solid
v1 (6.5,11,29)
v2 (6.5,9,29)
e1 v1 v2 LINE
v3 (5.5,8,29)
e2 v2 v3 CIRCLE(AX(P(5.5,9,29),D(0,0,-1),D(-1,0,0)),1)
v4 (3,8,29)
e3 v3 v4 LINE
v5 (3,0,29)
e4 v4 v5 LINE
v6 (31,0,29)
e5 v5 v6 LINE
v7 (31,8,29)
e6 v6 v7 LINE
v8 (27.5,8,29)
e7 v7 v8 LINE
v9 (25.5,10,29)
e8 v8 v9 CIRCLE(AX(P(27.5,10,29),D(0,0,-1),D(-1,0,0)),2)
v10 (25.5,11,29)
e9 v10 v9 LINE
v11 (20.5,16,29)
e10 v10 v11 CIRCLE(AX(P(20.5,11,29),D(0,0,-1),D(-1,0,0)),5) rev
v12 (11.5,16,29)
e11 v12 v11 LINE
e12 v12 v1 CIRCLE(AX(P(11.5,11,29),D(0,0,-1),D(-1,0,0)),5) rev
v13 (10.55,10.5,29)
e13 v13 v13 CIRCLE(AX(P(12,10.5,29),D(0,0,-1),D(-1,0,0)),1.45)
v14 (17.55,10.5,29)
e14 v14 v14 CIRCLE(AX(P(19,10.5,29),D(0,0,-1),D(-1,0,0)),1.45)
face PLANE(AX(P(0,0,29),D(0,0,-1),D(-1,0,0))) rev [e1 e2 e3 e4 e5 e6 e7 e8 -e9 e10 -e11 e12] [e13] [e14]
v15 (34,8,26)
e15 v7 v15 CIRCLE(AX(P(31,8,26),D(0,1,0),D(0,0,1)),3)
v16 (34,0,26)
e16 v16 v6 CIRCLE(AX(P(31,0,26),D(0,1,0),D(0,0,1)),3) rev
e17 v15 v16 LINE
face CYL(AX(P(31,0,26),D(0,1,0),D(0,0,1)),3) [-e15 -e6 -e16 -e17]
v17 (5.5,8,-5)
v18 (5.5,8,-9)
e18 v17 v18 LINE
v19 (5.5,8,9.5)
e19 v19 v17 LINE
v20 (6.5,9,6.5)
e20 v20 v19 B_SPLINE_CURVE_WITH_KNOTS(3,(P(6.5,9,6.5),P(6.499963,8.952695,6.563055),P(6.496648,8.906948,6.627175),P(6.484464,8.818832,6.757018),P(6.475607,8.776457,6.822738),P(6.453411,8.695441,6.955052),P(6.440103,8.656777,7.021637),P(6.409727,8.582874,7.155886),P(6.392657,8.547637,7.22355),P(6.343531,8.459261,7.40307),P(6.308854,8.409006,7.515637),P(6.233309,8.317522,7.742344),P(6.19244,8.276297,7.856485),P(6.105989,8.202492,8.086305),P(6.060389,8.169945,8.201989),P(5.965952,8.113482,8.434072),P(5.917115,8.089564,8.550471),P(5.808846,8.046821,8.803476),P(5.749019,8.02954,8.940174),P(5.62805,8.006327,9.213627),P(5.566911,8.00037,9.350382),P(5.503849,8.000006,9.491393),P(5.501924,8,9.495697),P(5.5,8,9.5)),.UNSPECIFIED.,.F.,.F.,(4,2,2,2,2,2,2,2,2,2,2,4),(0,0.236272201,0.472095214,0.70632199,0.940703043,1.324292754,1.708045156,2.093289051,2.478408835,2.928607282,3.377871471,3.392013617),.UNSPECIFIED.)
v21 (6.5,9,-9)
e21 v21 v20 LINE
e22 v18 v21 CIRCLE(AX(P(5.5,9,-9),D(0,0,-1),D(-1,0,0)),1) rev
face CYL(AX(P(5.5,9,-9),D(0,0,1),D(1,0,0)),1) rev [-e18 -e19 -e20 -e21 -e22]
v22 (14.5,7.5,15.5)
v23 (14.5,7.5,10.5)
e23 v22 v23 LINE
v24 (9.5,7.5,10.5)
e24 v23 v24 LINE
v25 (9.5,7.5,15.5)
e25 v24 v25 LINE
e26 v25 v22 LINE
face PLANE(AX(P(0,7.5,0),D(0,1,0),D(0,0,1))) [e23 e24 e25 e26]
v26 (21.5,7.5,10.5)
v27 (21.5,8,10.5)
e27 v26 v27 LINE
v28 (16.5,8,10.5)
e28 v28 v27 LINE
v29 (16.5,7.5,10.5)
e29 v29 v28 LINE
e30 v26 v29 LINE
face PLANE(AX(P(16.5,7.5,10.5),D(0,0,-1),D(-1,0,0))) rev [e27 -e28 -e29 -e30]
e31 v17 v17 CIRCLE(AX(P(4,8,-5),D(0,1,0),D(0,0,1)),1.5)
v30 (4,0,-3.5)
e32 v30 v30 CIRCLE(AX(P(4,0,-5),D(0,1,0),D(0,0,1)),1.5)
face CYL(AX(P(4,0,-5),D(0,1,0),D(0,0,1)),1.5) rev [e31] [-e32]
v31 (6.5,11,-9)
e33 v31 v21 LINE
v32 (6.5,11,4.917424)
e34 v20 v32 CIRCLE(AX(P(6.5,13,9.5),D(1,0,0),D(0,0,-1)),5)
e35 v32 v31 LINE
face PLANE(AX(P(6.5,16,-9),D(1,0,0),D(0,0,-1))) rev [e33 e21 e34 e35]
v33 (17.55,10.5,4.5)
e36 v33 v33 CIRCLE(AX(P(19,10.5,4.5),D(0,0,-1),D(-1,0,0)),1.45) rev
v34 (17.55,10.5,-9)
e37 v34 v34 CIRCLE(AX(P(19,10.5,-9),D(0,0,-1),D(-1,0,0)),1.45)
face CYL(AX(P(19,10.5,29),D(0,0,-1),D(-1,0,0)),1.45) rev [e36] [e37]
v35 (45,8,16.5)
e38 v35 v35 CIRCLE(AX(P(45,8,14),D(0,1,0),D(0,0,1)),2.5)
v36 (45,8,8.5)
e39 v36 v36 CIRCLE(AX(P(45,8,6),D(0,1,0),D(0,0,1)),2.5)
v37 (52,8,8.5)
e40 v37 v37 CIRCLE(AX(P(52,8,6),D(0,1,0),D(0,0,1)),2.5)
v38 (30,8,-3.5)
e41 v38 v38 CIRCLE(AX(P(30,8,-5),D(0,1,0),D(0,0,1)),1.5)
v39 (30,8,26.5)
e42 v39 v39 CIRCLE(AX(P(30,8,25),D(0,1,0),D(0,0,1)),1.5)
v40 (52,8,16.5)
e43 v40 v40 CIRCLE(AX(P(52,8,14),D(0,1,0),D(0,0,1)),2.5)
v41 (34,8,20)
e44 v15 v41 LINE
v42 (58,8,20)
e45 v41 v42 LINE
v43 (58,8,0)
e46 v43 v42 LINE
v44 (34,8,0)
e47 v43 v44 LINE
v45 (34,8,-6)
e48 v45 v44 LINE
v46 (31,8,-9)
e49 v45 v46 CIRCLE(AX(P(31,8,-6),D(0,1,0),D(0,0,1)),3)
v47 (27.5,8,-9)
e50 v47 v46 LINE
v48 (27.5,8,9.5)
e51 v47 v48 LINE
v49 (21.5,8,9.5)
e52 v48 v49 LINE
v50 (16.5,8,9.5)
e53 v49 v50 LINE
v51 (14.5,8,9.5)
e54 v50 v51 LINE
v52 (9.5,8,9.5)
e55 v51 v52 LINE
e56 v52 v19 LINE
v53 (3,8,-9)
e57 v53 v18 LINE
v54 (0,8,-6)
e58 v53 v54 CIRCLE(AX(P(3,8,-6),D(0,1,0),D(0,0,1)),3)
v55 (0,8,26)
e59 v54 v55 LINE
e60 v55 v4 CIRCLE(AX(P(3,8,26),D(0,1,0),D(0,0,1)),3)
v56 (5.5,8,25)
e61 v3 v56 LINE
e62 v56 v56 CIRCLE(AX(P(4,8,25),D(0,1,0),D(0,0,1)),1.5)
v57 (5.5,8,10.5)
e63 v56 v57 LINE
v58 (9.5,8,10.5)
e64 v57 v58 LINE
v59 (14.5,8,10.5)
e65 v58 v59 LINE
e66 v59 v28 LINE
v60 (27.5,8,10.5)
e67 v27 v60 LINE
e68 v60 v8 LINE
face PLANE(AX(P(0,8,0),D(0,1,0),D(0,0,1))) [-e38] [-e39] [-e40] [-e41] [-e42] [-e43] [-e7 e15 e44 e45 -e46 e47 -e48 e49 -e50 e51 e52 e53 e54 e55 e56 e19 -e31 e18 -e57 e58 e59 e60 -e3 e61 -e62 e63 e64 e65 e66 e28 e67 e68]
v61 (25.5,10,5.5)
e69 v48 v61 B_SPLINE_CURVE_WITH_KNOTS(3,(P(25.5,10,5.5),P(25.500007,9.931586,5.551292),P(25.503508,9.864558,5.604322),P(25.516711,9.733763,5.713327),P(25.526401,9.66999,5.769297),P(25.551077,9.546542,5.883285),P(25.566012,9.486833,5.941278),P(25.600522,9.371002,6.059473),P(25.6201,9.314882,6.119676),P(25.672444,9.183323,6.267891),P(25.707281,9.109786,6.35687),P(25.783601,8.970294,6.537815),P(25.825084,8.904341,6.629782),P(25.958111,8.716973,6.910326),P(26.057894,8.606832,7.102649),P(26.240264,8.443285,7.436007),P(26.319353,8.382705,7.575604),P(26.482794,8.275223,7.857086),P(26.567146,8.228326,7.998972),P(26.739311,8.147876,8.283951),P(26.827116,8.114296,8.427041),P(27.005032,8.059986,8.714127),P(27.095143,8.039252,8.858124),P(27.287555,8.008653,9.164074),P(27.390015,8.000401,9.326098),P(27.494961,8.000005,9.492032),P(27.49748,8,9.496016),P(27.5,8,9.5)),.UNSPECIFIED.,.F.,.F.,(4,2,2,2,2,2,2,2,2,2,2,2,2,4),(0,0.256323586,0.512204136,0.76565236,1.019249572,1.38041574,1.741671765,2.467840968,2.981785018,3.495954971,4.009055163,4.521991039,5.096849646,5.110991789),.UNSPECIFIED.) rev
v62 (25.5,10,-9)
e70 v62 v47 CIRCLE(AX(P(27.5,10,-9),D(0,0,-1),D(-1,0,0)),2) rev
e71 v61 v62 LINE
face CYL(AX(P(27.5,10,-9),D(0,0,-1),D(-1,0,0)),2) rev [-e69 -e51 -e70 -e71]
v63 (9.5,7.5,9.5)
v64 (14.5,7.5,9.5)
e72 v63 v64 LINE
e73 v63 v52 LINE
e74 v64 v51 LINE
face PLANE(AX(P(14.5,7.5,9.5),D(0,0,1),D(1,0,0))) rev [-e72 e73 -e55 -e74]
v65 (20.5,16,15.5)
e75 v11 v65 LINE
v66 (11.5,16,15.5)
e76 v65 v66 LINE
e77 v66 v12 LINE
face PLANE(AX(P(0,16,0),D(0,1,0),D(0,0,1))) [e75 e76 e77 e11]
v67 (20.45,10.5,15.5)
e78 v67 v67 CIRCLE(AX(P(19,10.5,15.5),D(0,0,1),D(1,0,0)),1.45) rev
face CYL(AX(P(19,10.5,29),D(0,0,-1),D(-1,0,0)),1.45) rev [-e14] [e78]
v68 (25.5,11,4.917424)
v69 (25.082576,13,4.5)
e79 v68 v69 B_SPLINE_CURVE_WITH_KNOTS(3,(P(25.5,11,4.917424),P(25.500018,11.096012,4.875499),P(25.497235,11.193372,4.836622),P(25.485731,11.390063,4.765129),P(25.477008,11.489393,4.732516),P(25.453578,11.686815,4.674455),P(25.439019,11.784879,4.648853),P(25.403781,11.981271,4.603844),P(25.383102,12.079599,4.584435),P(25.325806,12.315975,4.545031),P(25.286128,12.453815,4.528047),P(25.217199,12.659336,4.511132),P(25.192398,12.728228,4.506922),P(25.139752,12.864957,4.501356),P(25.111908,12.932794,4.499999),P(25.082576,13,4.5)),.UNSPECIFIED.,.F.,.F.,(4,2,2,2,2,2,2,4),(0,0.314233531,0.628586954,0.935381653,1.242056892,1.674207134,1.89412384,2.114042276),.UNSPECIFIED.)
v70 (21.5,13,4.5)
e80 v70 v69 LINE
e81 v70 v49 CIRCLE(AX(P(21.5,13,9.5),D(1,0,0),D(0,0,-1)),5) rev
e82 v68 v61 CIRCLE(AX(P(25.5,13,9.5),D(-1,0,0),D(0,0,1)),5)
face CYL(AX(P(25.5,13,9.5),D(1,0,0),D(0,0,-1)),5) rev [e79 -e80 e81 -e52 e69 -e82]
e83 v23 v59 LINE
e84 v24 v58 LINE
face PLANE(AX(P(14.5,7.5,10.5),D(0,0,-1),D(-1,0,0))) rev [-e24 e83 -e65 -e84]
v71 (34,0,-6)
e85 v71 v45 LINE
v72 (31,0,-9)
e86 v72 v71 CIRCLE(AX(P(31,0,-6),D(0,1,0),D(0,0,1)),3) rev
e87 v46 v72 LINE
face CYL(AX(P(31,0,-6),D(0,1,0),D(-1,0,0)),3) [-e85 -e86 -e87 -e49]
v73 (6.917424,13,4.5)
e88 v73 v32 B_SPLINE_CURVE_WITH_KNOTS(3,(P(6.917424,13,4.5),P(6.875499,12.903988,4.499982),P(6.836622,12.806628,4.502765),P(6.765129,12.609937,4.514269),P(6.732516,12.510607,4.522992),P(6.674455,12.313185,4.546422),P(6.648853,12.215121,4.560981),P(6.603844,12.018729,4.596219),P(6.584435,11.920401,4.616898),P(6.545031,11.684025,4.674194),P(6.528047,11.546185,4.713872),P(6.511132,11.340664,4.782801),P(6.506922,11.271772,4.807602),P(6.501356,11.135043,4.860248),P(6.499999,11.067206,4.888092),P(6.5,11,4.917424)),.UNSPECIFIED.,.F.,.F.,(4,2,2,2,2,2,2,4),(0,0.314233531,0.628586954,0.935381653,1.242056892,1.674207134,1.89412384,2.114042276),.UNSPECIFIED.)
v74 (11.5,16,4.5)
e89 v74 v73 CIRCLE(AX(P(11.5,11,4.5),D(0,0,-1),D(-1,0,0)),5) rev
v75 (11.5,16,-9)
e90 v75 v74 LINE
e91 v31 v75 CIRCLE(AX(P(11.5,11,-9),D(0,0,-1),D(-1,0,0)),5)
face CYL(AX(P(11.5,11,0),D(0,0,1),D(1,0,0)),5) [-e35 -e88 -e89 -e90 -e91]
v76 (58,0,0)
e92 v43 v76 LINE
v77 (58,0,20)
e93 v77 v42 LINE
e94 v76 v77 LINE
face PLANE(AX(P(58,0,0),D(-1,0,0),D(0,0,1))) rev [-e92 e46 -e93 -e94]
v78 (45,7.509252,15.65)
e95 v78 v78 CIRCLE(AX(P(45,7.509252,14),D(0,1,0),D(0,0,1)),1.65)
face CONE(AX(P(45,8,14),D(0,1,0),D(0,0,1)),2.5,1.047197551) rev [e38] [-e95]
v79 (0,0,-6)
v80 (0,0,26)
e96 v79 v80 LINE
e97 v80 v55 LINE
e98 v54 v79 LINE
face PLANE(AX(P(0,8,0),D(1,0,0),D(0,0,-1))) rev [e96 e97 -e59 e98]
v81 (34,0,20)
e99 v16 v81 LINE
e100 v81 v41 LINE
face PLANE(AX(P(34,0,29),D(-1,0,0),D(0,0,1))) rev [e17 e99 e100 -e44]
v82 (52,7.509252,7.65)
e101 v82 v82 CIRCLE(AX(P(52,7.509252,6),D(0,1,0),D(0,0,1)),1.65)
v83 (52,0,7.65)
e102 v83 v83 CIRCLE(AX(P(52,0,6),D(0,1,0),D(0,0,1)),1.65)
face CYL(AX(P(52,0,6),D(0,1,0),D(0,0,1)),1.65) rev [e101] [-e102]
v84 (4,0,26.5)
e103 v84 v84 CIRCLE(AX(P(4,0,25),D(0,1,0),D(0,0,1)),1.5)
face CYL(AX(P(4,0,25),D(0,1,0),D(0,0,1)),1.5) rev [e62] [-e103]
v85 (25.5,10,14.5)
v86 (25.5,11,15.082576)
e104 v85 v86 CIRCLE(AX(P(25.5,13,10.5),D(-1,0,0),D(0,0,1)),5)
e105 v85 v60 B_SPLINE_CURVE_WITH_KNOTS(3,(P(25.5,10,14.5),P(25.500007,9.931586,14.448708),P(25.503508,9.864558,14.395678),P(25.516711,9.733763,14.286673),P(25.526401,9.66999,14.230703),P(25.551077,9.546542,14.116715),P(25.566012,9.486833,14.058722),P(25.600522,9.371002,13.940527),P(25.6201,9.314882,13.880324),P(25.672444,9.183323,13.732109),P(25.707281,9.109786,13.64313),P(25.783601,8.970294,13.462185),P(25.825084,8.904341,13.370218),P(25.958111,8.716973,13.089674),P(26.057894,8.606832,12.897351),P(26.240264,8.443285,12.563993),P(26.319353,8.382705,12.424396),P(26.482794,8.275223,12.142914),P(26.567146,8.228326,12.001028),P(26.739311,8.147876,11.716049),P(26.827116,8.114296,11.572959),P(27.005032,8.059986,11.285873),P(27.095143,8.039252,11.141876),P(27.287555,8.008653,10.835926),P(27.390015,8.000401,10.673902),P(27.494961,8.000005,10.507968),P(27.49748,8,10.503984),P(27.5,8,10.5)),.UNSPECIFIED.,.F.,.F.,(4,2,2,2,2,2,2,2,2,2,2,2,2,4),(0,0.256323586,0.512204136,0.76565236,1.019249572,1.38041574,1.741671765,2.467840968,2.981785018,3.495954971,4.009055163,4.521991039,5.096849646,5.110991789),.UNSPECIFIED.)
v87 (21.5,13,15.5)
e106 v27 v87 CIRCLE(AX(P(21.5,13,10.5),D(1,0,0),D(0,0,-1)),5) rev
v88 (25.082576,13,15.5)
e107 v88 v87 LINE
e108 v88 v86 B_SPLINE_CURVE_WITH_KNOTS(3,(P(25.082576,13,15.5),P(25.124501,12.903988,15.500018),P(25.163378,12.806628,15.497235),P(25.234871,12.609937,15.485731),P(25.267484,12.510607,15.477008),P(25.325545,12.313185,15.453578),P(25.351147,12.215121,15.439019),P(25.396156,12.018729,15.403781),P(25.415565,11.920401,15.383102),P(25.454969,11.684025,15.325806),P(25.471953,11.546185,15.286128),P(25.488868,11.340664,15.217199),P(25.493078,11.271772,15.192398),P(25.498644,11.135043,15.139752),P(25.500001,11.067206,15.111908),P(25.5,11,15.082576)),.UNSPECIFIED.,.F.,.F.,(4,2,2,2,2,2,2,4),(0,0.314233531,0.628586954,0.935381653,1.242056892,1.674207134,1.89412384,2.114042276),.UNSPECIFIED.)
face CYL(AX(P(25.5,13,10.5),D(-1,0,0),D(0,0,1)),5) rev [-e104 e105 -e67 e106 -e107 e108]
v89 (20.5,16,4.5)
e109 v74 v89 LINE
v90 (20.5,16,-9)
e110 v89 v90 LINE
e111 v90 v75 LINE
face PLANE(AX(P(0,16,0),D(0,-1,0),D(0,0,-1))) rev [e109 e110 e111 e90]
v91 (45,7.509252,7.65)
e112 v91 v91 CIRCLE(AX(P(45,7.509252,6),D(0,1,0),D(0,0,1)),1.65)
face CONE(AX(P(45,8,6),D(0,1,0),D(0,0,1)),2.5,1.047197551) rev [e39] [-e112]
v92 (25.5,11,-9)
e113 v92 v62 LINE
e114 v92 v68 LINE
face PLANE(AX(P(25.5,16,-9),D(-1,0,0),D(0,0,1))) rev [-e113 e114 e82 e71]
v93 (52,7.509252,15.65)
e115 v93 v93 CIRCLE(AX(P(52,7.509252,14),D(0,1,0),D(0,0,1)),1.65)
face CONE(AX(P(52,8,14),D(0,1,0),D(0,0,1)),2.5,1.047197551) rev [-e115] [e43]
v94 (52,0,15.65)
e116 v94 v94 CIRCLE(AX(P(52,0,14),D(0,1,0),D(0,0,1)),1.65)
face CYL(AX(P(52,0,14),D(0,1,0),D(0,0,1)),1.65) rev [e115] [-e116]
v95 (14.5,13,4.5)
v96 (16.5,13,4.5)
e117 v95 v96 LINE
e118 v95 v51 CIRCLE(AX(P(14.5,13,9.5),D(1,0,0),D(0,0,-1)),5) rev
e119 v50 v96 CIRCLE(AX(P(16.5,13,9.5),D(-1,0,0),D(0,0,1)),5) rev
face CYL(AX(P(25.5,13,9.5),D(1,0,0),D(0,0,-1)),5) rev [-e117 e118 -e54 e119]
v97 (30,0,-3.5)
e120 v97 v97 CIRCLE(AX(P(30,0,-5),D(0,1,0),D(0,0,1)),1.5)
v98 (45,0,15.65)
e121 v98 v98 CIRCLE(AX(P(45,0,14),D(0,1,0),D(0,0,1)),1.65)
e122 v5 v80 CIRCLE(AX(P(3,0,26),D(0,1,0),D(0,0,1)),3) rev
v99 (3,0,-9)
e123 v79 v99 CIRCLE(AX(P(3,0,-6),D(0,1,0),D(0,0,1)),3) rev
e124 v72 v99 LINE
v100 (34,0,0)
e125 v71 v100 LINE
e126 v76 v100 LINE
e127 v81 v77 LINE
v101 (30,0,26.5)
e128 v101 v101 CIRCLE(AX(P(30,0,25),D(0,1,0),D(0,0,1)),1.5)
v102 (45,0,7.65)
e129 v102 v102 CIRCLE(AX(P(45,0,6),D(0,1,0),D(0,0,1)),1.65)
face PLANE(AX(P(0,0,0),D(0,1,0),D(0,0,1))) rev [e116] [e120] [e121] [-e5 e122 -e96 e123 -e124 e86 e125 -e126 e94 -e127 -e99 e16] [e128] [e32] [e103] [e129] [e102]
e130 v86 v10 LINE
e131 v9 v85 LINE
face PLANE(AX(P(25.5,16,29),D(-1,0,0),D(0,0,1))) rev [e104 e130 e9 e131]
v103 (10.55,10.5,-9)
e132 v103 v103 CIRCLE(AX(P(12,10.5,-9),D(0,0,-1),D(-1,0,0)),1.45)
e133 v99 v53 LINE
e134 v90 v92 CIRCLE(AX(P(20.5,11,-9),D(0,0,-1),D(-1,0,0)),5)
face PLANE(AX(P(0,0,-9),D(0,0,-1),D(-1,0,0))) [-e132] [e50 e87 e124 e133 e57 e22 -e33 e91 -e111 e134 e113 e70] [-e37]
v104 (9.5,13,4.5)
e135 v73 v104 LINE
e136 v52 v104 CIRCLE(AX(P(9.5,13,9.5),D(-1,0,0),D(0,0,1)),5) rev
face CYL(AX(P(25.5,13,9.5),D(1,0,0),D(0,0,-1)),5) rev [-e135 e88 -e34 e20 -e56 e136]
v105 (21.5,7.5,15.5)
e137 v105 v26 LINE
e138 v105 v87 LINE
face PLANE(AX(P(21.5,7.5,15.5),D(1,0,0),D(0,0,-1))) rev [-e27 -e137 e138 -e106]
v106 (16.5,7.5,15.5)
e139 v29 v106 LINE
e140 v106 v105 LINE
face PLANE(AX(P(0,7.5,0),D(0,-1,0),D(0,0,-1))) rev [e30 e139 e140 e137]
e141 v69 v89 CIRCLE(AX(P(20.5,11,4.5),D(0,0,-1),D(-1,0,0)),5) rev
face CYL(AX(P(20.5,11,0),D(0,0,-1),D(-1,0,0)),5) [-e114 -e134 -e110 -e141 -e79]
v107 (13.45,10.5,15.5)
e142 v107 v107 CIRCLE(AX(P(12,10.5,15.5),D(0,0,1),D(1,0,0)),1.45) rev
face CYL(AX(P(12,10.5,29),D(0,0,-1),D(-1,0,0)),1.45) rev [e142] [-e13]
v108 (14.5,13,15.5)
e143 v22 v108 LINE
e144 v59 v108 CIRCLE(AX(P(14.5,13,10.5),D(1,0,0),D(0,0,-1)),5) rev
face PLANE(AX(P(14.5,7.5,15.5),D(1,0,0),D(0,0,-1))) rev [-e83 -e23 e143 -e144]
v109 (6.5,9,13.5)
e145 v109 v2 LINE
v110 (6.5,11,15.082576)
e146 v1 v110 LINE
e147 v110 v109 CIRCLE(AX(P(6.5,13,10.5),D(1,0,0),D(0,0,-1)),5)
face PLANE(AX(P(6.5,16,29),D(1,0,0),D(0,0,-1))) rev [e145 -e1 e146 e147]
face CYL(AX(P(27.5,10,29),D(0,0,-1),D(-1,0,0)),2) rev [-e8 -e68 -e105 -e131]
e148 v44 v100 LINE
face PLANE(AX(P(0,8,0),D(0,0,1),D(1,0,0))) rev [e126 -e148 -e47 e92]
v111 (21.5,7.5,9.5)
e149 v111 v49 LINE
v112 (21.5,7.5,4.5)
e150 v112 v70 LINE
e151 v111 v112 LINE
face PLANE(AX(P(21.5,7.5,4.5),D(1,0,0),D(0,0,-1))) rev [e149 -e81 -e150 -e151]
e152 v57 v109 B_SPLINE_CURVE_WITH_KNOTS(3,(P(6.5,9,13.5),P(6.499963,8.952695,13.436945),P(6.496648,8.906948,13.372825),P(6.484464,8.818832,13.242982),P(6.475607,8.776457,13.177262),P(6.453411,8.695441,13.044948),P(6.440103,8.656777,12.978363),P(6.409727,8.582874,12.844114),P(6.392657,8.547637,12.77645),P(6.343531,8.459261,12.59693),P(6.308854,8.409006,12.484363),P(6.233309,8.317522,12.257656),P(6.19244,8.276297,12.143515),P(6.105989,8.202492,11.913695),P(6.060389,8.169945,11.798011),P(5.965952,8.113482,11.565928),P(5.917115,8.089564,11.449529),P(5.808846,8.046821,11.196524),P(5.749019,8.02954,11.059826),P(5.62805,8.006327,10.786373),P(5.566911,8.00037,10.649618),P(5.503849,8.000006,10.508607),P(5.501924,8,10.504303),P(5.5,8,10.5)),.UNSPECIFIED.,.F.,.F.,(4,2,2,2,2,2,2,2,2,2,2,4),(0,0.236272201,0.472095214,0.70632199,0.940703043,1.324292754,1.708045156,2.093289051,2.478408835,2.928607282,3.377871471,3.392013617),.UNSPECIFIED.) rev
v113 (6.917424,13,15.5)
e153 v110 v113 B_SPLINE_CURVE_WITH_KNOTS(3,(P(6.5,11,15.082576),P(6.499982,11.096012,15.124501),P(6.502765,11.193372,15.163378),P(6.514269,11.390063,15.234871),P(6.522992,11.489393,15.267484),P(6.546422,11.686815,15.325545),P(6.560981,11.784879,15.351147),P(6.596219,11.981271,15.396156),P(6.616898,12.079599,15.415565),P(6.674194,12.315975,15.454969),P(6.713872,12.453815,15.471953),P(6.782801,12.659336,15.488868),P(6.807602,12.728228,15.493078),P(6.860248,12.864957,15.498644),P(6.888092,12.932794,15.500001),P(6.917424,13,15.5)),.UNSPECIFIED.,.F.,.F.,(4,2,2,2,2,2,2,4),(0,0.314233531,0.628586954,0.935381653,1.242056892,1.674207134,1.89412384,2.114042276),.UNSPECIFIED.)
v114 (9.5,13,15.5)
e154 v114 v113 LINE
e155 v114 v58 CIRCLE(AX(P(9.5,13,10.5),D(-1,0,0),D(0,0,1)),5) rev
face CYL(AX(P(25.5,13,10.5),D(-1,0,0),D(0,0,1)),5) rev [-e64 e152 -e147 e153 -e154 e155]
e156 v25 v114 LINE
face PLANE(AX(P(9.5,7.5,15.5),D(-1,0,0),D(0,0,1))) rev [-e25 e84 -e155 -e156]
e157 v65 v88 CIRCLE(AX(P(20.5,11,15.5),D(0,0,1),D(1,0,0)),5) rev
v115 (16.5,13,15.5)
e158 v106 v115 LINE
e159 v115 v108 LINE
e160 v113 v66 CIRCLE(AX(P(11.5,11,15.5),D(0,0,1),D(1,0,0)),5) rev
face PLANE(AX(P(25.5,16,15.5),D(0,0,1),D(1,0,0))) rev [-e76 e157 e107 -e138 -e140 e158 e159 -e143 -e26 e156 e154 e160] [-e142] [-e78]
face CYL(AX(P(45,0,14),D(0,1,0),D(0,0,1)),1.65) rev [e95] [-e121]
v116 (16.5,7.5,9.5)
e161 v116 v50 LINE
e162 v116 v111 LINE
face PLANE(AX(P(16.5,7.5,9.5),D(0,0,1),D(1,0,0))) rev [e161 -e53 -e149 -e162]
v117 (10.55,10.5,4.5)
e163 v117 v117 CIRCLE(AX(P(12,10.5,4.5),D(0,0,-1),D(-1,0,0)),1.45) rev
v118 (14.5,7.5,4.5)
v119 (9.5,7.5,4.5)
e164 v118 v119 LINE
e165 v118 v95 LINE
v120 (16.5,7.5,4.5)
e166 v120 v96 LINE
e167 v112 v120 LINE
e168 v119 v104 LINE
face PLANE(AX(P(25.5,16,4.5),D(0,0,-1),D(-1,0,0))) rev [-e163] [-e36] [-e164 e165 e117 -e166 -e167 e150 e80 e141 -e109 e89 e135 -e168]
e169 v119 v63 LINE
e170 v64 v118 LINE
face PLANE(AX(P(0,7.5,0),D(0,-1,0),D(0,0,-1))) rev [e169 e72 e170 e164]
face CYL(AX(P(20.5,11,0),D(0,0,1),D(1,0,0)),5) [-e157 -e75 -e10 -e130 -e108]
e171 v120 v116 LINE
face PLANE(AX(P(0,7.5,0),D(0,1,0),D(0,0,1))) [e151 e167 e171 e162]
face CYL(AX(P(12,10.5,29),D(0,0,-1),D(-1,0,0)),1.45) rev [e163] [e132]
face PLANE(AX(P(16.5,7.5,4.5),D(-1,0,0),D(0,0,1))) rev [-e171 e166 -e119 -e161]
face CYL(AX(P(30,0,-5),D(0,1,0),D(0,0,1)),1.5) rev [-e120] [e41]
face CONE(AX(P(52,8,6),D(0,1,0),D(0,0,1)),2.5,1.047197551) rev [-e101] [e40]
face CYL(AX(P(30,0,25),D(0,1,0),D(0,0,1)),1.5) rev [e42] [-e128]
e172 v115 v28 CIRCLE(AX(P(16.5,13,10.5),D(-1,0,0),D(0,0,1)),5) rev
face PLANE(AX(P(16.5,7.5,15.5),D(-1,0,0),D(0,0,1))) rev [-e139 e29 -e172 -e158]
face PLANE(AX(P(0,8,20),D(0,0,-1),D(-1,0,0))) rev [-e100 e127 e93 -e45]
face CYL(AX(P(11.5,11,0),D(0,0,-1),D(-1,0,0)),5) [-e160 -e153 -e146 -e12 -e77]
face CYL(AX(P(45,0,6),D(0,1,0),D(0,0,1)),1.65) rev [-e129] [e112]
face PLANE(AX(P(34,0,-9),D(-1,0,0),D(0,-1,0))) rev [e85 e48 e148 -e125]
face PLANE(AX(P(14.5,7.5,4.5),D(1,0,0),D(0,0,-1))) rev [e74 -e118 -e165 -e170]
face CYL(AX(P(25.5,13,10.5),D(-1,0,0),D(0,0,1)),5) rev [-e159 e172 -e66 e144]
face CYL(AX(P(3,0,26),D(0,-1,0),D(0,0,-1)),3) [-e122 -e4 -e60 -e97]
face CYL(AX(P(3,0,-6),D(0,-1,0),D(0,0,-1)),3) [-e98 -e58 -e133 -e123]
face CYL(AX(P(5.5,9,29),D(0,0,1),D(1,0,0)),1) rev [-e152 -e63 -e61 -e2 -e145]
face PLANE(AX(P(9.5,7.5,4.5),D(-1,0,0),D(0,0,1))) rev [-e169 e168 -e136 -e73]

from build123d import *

# Parameters (mm, degrees)
SKETCH1_W                 = 300
SKETCH1_H                 = 20
BOSS_EXTRUDE1_DEPTH       = 8
SKETCH2_W                 = 34
SKETCH2_H                 = 8
BOSS_EXTRUDE2_DEPTH       = 9
SKETCH3_W                 = 34
SKETCH3_H                 = 8
BOSS_EXTRUDE3_DEPTH       = 9
SKETCH4_R                 = 1.5
CUT_EXTRUDE1_DEPTH        = 302.504560496
SKETCH5_W                 = 25
SKETCH5_H                 = 8
BOSS_EXTRUDE4_DEPTH       = 17
SKETCH6_W                 = 25
SKETCH6_H                 = 8
BOSS_EXTRUDE5_DEPTH       = 17
SKETCH12_W                = 8
SKETCH12_H                = 8
BOSS_EXTRUDE7_DEPTH       = 17
BOSS_EXTRUDE8_DEPTH       = 12
SKETCH15_R                = 1.6
CUT_EXTRUDE7_DEPTH        = 20
SKETCH16_W                = 20
SKETCH16_H                = 13
BOSS_EXTRUDE9_DEPTH       = 12
SKETCH17_R                = 1.6
CUT_EXTRUDE8_DEPTH        = 20
SKETCH22_W                = 10
SKETCH22_H                = 38
CUT_EXTRUDE11_DEPTH       = 306.0983448
SKETCH23_W                = 8
SKETCH23_H                = 18
CUT_EXTRUDE12_DEPTH       = 4
BOSS_EXTRUDE12_DEPTH      = 10
BOSS_EXTRUDE13_DEPTH      = 8
SKETCH26_W                = 8
SKETCH26_H                = 48
BOSS_EXTRUDE14_DEPTH      = 14
SKETCH27_W                = 8
SKETCH27_H                = 16
BOSS_EXTRUDE15_DEPTH      = 14
SKETCH28_W                = 8
SKETCH28_H                = 40
CUT_EXTRUDE13_DEPTH       = 14
SKETCH30_W                = 16
SKETCH30_H                = 14
BOSS_EXTRUDE16_DEPTH      = 9
SKETCH31_W                = 17
SKETCH31_H                = 8
CUT_EXTRUDE14_DEPTH       = 5
SKETCH32_W                = 16
SKETCH32_H                = 9
CUT_EXTRUDE15_DEPTH       = 9
CUT_EXTRUDE16_DEPTH       = 10
SKETCH34_W                = 7
SKETCH34_H                = 5
CUT_EXTRUDE17_DEPTH       = 5
SKETCH35_W                = 7
SKETCH35_H                = 5
BOSS_EXTRUDE17_DEPTH      = 5
SKETCH36_R                = 1.7
CUT_EXTRUDE18_DEPTH       = 307.014705529
SKETCH37_W                = 70
SKETCH37_H                = 8
BOSS_EXTRUDE18_DEPTH      = 5
SKETCH39_W                = 66
SKETCH39_H                = 6
CUT_EXTRUDE19_DEPTH       = 306.14258962
SKETCH46_W                = 20
SKETCH46_H                = 12
SKETCH46_W_2              = 19.974984355
BOSS_EXTRUDE23_DEPTH      = 10
BOSS_EXTRUDE24_DEPTH      = 5
BOSS_EXTRUDE24_DEPTH_BACK = 5
SKETCH47_W                = 28
SKETCH47_H                = 12
SKETCH47_W_2              = 28.025015645
SKETCH48_R                = 1.5
CUT_EXTRUDE22_DEPTH       = 15
SKETCH49_R                = 1.45
CUT_EXTRUDE23_DEPTH       = 309.139578763
SKETCH50_W                = 96.54170444
SKETCH50_H                = 99.159492098
CUT_EXTRUDE24_DEPTH       = 245
SKETCH51_R                = 1.65
CUT_EXTRUDE25_DEPTH       = 66.337584896
SKETCH52_W                = 19
SKETCH52_H                = 13.5
BOSS_EXTRUDE25_DEPTH      = 8
FILLET1_R                 = 5
SKETCH53_R                = 1.45
CUT_EXTRUDE26_DEPTH       = 72.161787499
FILLET2_R                 = 5
FILLET3_R                 = 3
SKETCH54_W                = 5
SKETCH54_H                = 5
CUT_EXTRUDE27_DEPTH       = 8.5
FILLET4_R                 = 1
FILLET5_R                 = 2


with BuildPart() as part:
    # Sketch1 → Boss-Extrude1 (new body)
    with BuildSketch(Plane(origin=(0, 0, 0), x_dir=(1, 0, 0), z_dir=(0, 1, 0))):
        with Locations((150, -10)):
            Rectangle(SKETCH1_W, SKETCH1_H)
    extrude(amount=BOSS_EXTRUDE1_DEPTH)

    # Sketch2 → Boss-Extrude2 (add)
    with BuildSketch(Plane.XY.offset(20)):
        with Locations((17, 4)):
            Rectangle(SKETCH2_W, SKETCH2_H)
        with Locations((283, 4)):
            Rectangle(SKETCH2_W, SKETCH2_H)
    extrude(amount=BOSS_EXTRUDE2_DEPTH)

    # Sketch3 → Boss-Extrude3 (add)
    with BuildSketch(Plane(origin=(0, 0, 0), x_dir=(-1, 0, 0), z_dir=(0, 0, -1))):
        with Locations((-17, 4)):
            Rectangle(SKETCH3_W, SKETCH3_H)
        with Locations((-283, 4)):
            Rectangle(SKETCH3_W, SKETCH3_H)
    extrude(amount=BOSS_EXTRUDE3_DEPTH)

    # Sketch4 → Cut-Extrude1 (cut, through all)
    with BuildSketch(Plane(origin=(0, 8, 0), x_dir=(1, 0, 0), z_dir=(0, 1, 0))):
        with Locations(Location((4, 5, 0), (0, 0, 270))):
            Circle(SKETCH4_R)
        with Locations(Location((30, 5, 0), (0, 0, 270))):
            Circle(SKETCH4_R)
        with Locations(Location((30, -25, 0), (0, 0, 270))):
            Circle(SKETCH4_R)
        with Locations(Location((4, -25, 0), (0, 0, 270))):
            Circle(SKETCH4_R)
        with Locations(Location((296, -25, 0), (0, 0, 270))):
            Circle(SKETCH4_R)
        with Locations(Location((296, 5, 0), (0, 0, 270))):
            Circle(SKETCH4_R)
        with Locations(Location((270, -25, 0), (0, 0, 270))):
            Circle(SKETCH4_R)
        with Locations(Location((270, 5, 0), (0, 0, 270))):
            Circle(SKETCH4_R)
    extrude(amount=-CUT_EXTRUDE1_DEPTH, mode=Mode.SUBTRACT)

    # Sketch5 → Boss-Extrude4 (add)
    with BuildSketch(Plane.XY.offset(20)):
        with Locations((253.5, 4)):
            Rectangle(SKETCH5_W, SKETCH5_H)
    extrude(amount=BOSS_EXTRUDE4_DEPTH)

    # Sketch6 → Boss-Extrude5 (add)
    with BuildSketch(Plane(origin=(0, 0, 0), x_dir=(-1, 0, 0), z_dir=(0, 0, -1))):
        with Locations((-253.5, 4)):
            Rectangle(SKETCH6_W, SKETCH6_H)
    extrude(amount=BOSS_EXTRUDE5_DEPTH)

    # Sketch12 → Boss-Extrude7 (add)
    with BuildSketch(Plane.XY.offset(37)):
        with Locations((245, 4)):
            Rectangle(SKETCH12_W, SKETCH12_H)
    extrude(amount=BOSS_EXTRUDE7_DEPTH)

    # Sketch14 → Boss-Extrude8 (add)
    with BuildSketch(Plane.XY.offset(29)):
        Polygon((294.974984355, 8), (275, 8), (275, -4), (294.974984355, -5), align=None)
    extrude(amount=BOSS_EXTRUDE8_DEPTH)

    # Sketch15 → Cut-Extrude7 (cut)
    with BuildSketch(Plane(origin=(294.974984355, 0, 0), x_dir=(0, 0, -1), z_dir=(1, 0, 0))):
        with Locations((-35, 0)):
            Circle(SKETCH15_R)
    extrude(amount=-CUT_EXTRUDE7_DEPTH, mode=Mode.SUBTRACT)

    # Sketch16 → Boss-Extrude9 (add)
    with BuildSketch(Plane(origin=(0, 0, -9), x_dir=(-1, 0, 0), z_dir=(0, 0, -1))):
        with Locations((-285, 1.5)):
            Rectangle(SKETCH16_W, SKETCH16_H)
    extrude(amount=BOSS_EXTRUDE9_DEPTH)

    # Sketch17 → Cut-Extrude8 (cut)
    with BuildSketch(Plane(origin=(295, 0, 0), x_dir=(0, 0, -1), z_dir=(1, 0, 0))):
        with Locations((15, 0)):
            Circle(SKETCH17_R)
    extrude(amount=-CUT_EXTRUDE8_DEPTH, mode=Mode.SUBTRACT)

    # Sketch22 → Cut-Extrude11 (cut, through all)
    with BuildSketch(Plane(origin=(0, 8, 0), x_dir=(1, 0, 0), z_dir=(0, 1, 0))):
        with Locations((254, -10)):
            Rectangle(SKETCH22_W, SKETCH22_H)
    extrude(amount=-CUT_EXTRUDE11_DEPTH, mode=Mode.SUBTRACT)

    # Sketch23 → Cut-Extrude12 (cut)
    with BuildSketch(Plane(origin=(0, 0, 0), x_dir=(-1, 0, 0), z_dir=(0, -1, 0))):
        with Locations((-263, -10)):
            Rectangle(SKETCH23_W, SKETCH23_H)
    extrude(amount=-CUT_EXTRUDE12_DEPTH, mode=Mode.SUBTRACT)

    # Sketch24 → Boss-Extrude12 (add)
    with BuildSketch(Plane.ZY.offset(-259)):
        Polygon((-9, 0), (-9, 8), (-1, 8), align=None)
        Polygon((29, 0), (29, 8), (21, 8), align=None)
    extrude(amount=BOSS_EXTRUDE12_DEPTH)

    # Sketch25 → Boss-Extrude13 (add)
    with BuildSketch(Plane.ZY.offset(-267)):
        Polygon((19, 0), (19, 4), (15, 4), align=None)
        Polygon((1, 4), (5, 4), (1, 0), align=None)
    extrude(amount=BOSS_EXTRUDE13_DEPTH)

    # Sketch26 → Boss-Extrude14 (add)
    with BuildSketch(Plane(origin=(0, 8, 0), x_dir=(1, 0, 0), z_dir=(0, 1, 0))):
        with Locations((245, -30)):
            Rectangle(SKETCH26_W, SKETCH26_H)
    extrude(amount=BOSS_EXTRUDE14_DEPTH)

    # Sketch27 → Boss-Extrude15 (add)
    with BuildSketch(Plane(origin=(0, 8, 0), x_dir=(1, 0, 0), z_dir=(0, 1, 0))):
        with Locations((253, -29)):
            Rectangle(SKETCH27_W, SKETCH27_H)
    extrude(amount=BOSS_EXTRUDE15_DEPTH)

    # Sketch28 → Cut-Extrude13 (cut)
    with BuildSketch(Plane.XZ):
        with Locations((245, 34)):
            Rectangle(SKETCH28_W, SKETCH28_H)
    extrude(amount=-CUT_EXTRUDE13_DEPTH, mode=Mode.SUBTRACT)

    # Sketch30 → Boss-Extrude16 (add)
    with BuildSketch(Plane(origin=(257, 0, 0), x_dir=(0, 0, -1), z_dir=(1, 0, 0))):
        with Locations((-29, 15)):
            Rectangle(SKETCH30_W, SKETCH30_H)
    extrude(amount=BOSS_EXTRUDE16_DEPTH)

    # Sketch31 → Cut-Extrude14 (cut)
    with BuildSketch(Plane(origin=(0, 0, 0), x_dir=(-1, 0, 0), z_dir=(0, -1, 0))):
        with Locations((-257.5, -33)):
            Rectangle(SKETCH31_W, SKETCH31_H)
    extrude(amount=-CUT_EXTRUDE14_DEPTH, mode=Mode.SUBTRACT)

    # Sketch32 → Cut-Extrude15 (cut)
    with BuildSketch(Plane(origin=(266, 0, 0), x_dir=(0, 0, -1), z_dir=(1, 0, 0))):
        with Locations((-29, 17.5)):
            Rectangle(SKETCH32_W, SKETCH32_H)
    extrude(amount=-CUT_EXTRUDE15_DEPTH, mode=Mode.SUBTRACT)

    # Sketch33 → Cut-Extrude16 (cut)
    with BuildSketch(Plane.ZY.offset(-249)):
        Polygon((29, 5), (24, 5), (29, 0), align=None)
    extrude(amount=-CUT_EXTRUDE16_DEPTH, mode=Mode.SUBTRACT)

    # Sketch34 → Cut-Extrude17 (cut)
    with BuildSketch(Plane.XY.offset(29)):
        with Locations((262.5, 2.5)):
            Rectangle(SKETCH34_W, SKETCH34_H)
    extrude(amount=-CUT_EXTRUDE17_DEPTH, mode=Mode.SUBTRACT)

    # Sketch35 → Boss-Extrude17 (add)
    with BuildSketch(Plane(origin=(0, 0, 21), x_dir=(-1, 0, 0), z_dir=(0, 0, -1))):
        with Locations((-262.5, 10.5)):
            Rectangle(SKETCH35_W, SKETCH35_H)
    extrude(amount=BOSS_EXTRUDE17_DEPTH)

    # Sketch36 → Cut-Extrude18 (cut, through all)
    with BuildSketch(Plane(origin=(0, 22, 0), x_dir=(1, 0, 0), z_dir=(0, 1, 0))):
        with Locations(Location((245, -50, 0), (0, 0, 270))):
            Circle(SKETCH36_R)
        with Locations(Location((245, -18, 0), (0, 0, 270))):
            Circle(SKETCH36_R)
    extrude(amount=-CUT_EXTRUDE18_DEPTH, mode=Mode.SUBTRACT)

    # Sketch37 → Boss-Extrude18 (add)
    with BuildSketch(Plane(origin=(0, 8, 0), x_dir=(1, 0, 0), z_dir=(0, 1, 0))):
        with Locations((206, -10)):
            Rectangle(SKETCH37_W, SKETCH37_H)
    extrude(amount=BOSS_EXTRUDE18_DEPTH)

    # Sketch39 → Cut-Extrude19 (cut, through all)
    with BuildSketch(Plane(origin=(0, 8, 0), x_dir=(1, 0, 0), z_dir=(0, 1, 0))):
        with Locations((208, -17)):
            Rectangle(SKETCH39_W, SKETCH39_H)
    extrude(amount=-CUT_EXTRUDE19_DEPTH, mode=Mode.SUBTRACT)

    # Sketch46 → Boss-Extrude23 (add)
    with BuildSketch(Plane(origin=(0, 8, 0), x_dir=(1, 0, 0), z_dir=(0, 1, 0))):
        with Locations((285, 15)):
            Rectangle(SKETCH46_W, SKETCH46_H)
        with Locations((284.987492178, -35)):
            Rectangle(SKETCH46_W_2, SKETCH46_H)
    extrude(amount=BOSS_EXTRUDE23_DEPTH)

    # Sketch47 → Boss-Extrude24 (add, two sides: drawn at the far end of the back side and taken through both)
    with BuildSketch(Plane(origin=(0, 18, 0), x_dir=(1, 0, 0), z_dir=(0, 1, 0)).offset(-BOSS_EXTRUDE24_DEPTH_BACK)):
        with Locations((289, 15)):
            Rectangle(SKETCH47_W, SKETCH47_H)
        with Locations((288.987492178, -35)):
            Rectangle(SKETCH47_W_2, SKETCH47_H)
    extrude(amount=BOSS_EXTRUDE24_DEPTH + BOSS_EXTRUDE24_DEPTH_BACK)

    # Sketch48 → Cut-Extrude22 (cut)
    with BuildSketch(Plane(origin=(303, 0, 0), x_dir=(0, 0, -1), z_dir=(1, 0, 0))):
        with Locations((16, 18)):
            Circle(SKETCH48_R)
        with Locations((-36, 18)):
            Circle(SKETCH48_R)
    extrude(amount=-CUT_EXTRUDE22_DEPTH, mode=Mode.SUBTRACT)

    # Sketch49 → Cut-Extrude23 (cut, through all)
    with BuildSketch(Plane(origin=(0, 8, 0), x_dir=(1, 0, 0), z_dir=(0, 1, 0))):
        with Locations(Location((78, -8, 0), (0, 0, 270))):
            Circle(SKETCH49_R)
        with Locations(Location((78, -12, 0), (0, 0, 270))):
            Circle(SKETCH49_R)
    extrude(amount=-CUT_EXTRUDE23_DEPTH, mode=Mode.SUBTRACT)

    # Sketch50 → Cut-Extrude24 (cut)
    with BuildSketch(Plane(origin=(303, 0, 0), x_dir=(0, 0, -1), z_dir=(1, 0, 0))):
        with Locations((-19.562356109, -1.790710069)):
            Rectangle(SKETCH50_W, SKETCH50_H)
    extrude(amount=-CUT_EXTRUDE24_DEPTH, mode=Mode.SUBTRACT)

    # Sketch51 → Cut-Extrude25 (cut, through all)
    with BuildSketch(Plane(origin=(0, 8, 0), x_dir=(1, 0, 0), z_dir=(0, 1, 0))):
        with Locations(Location((52, -14, 0), (0, 0, 270))):
            Circle(SKETCH51_R)
        with Locations(Location((45, -14, 0), (0, 0, 270))):
            Circle(SKETCH51_R)
        with Locations(Location((45, -6, 0), (0, 0, 270))):
            Circle(SKETCH51_R)
        with Locations(Location((52, -6, 0), (0, 0, 270))):
            Circle(SKETCH51_R)
    extrude(amount=-CUT_EXTRUDE25_DEPTH, mode=Mode.SUBTRACT)

    # Sketch52 → Boss-Extrude25 (add)
    with BuildSketch(Plane(origin=(0, 8, 0), x_dir=(1, 0, 0), z_dir=(0, 1, 0))):
        with Locations((16, 2.25)):
            Rectangle(SKETCH52_W, SKETCH52_H)
        with Locations((16, -22.25)):
            Rectangle(SKETCH52_W, SKETCH52_H)
    extrude(amount=BOSS_EXTRUDE25_DEPTH)

    # Fillet1
    fillet1_edges = [part.edges().sort_by_distance(p)[0] for p in [
        (16, 8, 4.5),
        (16, 8, 15.5),
    ]]
    fillet(fillet1_edges, radius=FILLET1_R)

    # Sketch53 → Cut-Extrude26 (cut, through all)
    with BuildSketch(Plane(origin=(0, 0, -9), x_dir=(-1, 0, 0), z_dir=(0, 0, -1))):
        with Locations((-19, 10.5)):
            Circle(SKETCH53_R)
        with Locations((-12, 10.5)):
            Circle(SKETCH53_R)
    extrude(amount=-CUT_EXTRUDE26_DEPTH, mode=Mode.SUBTRACT)

    # Fillet2
    fillet2_edges = [part.edges().sort_by_distance(p)[0] for p in [
        (25.5, 16, 22.25),
        (6.5, 16, 22.25),
        (6.5, 16, -2.25),
        (25.5, 16, -2.25),
    ]]
    fillet(fillet2_edges, radius=FILLET2_R)

    # Fillet3
    fillet3_edges = [part.edges().sort_by_distance(p)[0] for p in [
        (0, 4, 29),
        (34, 4, 29),
        (0, 4, -9),
        (34, 4, -9),
    ]]
    fillet(fillet3_edges, radius=FILLET3_R)

    # Sketch54 → Cut-Extrude27 (cut)
    with BuildSketch(Plane(origin=(0, 16, 0), x_dir=(1, 0, 0), z_dir=(0, 1, 0))):
        with Locations((19, -7)):
            Rectangle(SKETCH54_W, SKETCH54_H)
        with Locations((12, -7)):
            Rectangle(SKETCH54_W, SKETCH54_H)
        with Locations((19, -13)):
            Rectangle(SKETCH54_W, SKETCH54_H)
        with Locations((12, -13)):
            Rectangle(SKETCH54_W, SKETCH54_H)
    extrude(amount=-CUT_EXTRUDE27_DEPTH, mode=Mode.SUBTRACT)

    # Fillet4
    fillet4_edges = [part.edges().sort_by_distance(p)[0] for p in [
        (6.5, 8, 0.25),
        (6.5, 8, 19.75),
    ]]
    fillet(fillet4_edges, radius=FILLET4_R - 0.0001)  # a hair under: the kernel refuses the full size

    # Fillet5
    fillet5_edges = [part.edges().sort_by_distance(p)[0] for p in [
        (25.5, 8, 0.25),
        (25.5, 8, 19.75),
    ]]
    fillet(fillet5_edges, radius=FILLET5_R)

    # Cut-Extrude28 cone 1 section (through the dimple's axis) → Cut-Extrude28 (revolve, cut)
    with BuildSketch(Plane(origin=(45, 8, 6), x_dir=(0, 0, 1), z_dir=(1, 0, 0))):
        Polygon((0, 0), (2.5, 0), (0, 1.443375673), align=None)
    revolve(axis=Axis((45, 8, 6), (0, -1, 0)), mode=Mode.SUBTRACT)

    # Cut-Extrude28 cone 2 section (through the dimple's axis) → Cut-Extrude28 cone 2 (revolve, cut)
    with BuildSketch(Plane(origin=(52, 8, 6), x_dir=(0, 0, 1), z_dir=(1, 0, 0))):
        Polygon((0, 0), (2.5, 0), (0, 1.443375673), align=None)
    revolve(axis=Axis((52, 8, 6), (0, -1, 0)), mode=Mode.SUBTRACT)

    # Cut-Extrude28 cone 3 section (through the dimple's axis) → Cut-Extrude28 cone 3 (revolve, cut)
    with BuildSketch(Plane(origin=(52, 8, 14), x_dir=(0, 0, 1), z_dir=(1, 0, 0))):
        Polygon((0, 0), (2.5, 0), (0, 1.443375673), align=None)
    revolve(axis=Axis((52, 8, 14), (0, -1, 0)), mode=Mode.SUBTRACT)

    # Cut-Extrude28 cone 4 section (through the dimple's axis) → Cut-Extrude28 cone 4 (revolve, cut)
    with BuildSketch(Plane(origin=(45, 8, 14), x_dir=(0, 0, 1), z_dir=(1, 0, 0))):
        Polygon((0, 0), (2.5, 0), (0, 1.443375673), align=None)
    revolve(axis=Axis((45, 8, 14), (0, -1, 0)), mode=Mode.SUBTRACT)


solid = part.part
